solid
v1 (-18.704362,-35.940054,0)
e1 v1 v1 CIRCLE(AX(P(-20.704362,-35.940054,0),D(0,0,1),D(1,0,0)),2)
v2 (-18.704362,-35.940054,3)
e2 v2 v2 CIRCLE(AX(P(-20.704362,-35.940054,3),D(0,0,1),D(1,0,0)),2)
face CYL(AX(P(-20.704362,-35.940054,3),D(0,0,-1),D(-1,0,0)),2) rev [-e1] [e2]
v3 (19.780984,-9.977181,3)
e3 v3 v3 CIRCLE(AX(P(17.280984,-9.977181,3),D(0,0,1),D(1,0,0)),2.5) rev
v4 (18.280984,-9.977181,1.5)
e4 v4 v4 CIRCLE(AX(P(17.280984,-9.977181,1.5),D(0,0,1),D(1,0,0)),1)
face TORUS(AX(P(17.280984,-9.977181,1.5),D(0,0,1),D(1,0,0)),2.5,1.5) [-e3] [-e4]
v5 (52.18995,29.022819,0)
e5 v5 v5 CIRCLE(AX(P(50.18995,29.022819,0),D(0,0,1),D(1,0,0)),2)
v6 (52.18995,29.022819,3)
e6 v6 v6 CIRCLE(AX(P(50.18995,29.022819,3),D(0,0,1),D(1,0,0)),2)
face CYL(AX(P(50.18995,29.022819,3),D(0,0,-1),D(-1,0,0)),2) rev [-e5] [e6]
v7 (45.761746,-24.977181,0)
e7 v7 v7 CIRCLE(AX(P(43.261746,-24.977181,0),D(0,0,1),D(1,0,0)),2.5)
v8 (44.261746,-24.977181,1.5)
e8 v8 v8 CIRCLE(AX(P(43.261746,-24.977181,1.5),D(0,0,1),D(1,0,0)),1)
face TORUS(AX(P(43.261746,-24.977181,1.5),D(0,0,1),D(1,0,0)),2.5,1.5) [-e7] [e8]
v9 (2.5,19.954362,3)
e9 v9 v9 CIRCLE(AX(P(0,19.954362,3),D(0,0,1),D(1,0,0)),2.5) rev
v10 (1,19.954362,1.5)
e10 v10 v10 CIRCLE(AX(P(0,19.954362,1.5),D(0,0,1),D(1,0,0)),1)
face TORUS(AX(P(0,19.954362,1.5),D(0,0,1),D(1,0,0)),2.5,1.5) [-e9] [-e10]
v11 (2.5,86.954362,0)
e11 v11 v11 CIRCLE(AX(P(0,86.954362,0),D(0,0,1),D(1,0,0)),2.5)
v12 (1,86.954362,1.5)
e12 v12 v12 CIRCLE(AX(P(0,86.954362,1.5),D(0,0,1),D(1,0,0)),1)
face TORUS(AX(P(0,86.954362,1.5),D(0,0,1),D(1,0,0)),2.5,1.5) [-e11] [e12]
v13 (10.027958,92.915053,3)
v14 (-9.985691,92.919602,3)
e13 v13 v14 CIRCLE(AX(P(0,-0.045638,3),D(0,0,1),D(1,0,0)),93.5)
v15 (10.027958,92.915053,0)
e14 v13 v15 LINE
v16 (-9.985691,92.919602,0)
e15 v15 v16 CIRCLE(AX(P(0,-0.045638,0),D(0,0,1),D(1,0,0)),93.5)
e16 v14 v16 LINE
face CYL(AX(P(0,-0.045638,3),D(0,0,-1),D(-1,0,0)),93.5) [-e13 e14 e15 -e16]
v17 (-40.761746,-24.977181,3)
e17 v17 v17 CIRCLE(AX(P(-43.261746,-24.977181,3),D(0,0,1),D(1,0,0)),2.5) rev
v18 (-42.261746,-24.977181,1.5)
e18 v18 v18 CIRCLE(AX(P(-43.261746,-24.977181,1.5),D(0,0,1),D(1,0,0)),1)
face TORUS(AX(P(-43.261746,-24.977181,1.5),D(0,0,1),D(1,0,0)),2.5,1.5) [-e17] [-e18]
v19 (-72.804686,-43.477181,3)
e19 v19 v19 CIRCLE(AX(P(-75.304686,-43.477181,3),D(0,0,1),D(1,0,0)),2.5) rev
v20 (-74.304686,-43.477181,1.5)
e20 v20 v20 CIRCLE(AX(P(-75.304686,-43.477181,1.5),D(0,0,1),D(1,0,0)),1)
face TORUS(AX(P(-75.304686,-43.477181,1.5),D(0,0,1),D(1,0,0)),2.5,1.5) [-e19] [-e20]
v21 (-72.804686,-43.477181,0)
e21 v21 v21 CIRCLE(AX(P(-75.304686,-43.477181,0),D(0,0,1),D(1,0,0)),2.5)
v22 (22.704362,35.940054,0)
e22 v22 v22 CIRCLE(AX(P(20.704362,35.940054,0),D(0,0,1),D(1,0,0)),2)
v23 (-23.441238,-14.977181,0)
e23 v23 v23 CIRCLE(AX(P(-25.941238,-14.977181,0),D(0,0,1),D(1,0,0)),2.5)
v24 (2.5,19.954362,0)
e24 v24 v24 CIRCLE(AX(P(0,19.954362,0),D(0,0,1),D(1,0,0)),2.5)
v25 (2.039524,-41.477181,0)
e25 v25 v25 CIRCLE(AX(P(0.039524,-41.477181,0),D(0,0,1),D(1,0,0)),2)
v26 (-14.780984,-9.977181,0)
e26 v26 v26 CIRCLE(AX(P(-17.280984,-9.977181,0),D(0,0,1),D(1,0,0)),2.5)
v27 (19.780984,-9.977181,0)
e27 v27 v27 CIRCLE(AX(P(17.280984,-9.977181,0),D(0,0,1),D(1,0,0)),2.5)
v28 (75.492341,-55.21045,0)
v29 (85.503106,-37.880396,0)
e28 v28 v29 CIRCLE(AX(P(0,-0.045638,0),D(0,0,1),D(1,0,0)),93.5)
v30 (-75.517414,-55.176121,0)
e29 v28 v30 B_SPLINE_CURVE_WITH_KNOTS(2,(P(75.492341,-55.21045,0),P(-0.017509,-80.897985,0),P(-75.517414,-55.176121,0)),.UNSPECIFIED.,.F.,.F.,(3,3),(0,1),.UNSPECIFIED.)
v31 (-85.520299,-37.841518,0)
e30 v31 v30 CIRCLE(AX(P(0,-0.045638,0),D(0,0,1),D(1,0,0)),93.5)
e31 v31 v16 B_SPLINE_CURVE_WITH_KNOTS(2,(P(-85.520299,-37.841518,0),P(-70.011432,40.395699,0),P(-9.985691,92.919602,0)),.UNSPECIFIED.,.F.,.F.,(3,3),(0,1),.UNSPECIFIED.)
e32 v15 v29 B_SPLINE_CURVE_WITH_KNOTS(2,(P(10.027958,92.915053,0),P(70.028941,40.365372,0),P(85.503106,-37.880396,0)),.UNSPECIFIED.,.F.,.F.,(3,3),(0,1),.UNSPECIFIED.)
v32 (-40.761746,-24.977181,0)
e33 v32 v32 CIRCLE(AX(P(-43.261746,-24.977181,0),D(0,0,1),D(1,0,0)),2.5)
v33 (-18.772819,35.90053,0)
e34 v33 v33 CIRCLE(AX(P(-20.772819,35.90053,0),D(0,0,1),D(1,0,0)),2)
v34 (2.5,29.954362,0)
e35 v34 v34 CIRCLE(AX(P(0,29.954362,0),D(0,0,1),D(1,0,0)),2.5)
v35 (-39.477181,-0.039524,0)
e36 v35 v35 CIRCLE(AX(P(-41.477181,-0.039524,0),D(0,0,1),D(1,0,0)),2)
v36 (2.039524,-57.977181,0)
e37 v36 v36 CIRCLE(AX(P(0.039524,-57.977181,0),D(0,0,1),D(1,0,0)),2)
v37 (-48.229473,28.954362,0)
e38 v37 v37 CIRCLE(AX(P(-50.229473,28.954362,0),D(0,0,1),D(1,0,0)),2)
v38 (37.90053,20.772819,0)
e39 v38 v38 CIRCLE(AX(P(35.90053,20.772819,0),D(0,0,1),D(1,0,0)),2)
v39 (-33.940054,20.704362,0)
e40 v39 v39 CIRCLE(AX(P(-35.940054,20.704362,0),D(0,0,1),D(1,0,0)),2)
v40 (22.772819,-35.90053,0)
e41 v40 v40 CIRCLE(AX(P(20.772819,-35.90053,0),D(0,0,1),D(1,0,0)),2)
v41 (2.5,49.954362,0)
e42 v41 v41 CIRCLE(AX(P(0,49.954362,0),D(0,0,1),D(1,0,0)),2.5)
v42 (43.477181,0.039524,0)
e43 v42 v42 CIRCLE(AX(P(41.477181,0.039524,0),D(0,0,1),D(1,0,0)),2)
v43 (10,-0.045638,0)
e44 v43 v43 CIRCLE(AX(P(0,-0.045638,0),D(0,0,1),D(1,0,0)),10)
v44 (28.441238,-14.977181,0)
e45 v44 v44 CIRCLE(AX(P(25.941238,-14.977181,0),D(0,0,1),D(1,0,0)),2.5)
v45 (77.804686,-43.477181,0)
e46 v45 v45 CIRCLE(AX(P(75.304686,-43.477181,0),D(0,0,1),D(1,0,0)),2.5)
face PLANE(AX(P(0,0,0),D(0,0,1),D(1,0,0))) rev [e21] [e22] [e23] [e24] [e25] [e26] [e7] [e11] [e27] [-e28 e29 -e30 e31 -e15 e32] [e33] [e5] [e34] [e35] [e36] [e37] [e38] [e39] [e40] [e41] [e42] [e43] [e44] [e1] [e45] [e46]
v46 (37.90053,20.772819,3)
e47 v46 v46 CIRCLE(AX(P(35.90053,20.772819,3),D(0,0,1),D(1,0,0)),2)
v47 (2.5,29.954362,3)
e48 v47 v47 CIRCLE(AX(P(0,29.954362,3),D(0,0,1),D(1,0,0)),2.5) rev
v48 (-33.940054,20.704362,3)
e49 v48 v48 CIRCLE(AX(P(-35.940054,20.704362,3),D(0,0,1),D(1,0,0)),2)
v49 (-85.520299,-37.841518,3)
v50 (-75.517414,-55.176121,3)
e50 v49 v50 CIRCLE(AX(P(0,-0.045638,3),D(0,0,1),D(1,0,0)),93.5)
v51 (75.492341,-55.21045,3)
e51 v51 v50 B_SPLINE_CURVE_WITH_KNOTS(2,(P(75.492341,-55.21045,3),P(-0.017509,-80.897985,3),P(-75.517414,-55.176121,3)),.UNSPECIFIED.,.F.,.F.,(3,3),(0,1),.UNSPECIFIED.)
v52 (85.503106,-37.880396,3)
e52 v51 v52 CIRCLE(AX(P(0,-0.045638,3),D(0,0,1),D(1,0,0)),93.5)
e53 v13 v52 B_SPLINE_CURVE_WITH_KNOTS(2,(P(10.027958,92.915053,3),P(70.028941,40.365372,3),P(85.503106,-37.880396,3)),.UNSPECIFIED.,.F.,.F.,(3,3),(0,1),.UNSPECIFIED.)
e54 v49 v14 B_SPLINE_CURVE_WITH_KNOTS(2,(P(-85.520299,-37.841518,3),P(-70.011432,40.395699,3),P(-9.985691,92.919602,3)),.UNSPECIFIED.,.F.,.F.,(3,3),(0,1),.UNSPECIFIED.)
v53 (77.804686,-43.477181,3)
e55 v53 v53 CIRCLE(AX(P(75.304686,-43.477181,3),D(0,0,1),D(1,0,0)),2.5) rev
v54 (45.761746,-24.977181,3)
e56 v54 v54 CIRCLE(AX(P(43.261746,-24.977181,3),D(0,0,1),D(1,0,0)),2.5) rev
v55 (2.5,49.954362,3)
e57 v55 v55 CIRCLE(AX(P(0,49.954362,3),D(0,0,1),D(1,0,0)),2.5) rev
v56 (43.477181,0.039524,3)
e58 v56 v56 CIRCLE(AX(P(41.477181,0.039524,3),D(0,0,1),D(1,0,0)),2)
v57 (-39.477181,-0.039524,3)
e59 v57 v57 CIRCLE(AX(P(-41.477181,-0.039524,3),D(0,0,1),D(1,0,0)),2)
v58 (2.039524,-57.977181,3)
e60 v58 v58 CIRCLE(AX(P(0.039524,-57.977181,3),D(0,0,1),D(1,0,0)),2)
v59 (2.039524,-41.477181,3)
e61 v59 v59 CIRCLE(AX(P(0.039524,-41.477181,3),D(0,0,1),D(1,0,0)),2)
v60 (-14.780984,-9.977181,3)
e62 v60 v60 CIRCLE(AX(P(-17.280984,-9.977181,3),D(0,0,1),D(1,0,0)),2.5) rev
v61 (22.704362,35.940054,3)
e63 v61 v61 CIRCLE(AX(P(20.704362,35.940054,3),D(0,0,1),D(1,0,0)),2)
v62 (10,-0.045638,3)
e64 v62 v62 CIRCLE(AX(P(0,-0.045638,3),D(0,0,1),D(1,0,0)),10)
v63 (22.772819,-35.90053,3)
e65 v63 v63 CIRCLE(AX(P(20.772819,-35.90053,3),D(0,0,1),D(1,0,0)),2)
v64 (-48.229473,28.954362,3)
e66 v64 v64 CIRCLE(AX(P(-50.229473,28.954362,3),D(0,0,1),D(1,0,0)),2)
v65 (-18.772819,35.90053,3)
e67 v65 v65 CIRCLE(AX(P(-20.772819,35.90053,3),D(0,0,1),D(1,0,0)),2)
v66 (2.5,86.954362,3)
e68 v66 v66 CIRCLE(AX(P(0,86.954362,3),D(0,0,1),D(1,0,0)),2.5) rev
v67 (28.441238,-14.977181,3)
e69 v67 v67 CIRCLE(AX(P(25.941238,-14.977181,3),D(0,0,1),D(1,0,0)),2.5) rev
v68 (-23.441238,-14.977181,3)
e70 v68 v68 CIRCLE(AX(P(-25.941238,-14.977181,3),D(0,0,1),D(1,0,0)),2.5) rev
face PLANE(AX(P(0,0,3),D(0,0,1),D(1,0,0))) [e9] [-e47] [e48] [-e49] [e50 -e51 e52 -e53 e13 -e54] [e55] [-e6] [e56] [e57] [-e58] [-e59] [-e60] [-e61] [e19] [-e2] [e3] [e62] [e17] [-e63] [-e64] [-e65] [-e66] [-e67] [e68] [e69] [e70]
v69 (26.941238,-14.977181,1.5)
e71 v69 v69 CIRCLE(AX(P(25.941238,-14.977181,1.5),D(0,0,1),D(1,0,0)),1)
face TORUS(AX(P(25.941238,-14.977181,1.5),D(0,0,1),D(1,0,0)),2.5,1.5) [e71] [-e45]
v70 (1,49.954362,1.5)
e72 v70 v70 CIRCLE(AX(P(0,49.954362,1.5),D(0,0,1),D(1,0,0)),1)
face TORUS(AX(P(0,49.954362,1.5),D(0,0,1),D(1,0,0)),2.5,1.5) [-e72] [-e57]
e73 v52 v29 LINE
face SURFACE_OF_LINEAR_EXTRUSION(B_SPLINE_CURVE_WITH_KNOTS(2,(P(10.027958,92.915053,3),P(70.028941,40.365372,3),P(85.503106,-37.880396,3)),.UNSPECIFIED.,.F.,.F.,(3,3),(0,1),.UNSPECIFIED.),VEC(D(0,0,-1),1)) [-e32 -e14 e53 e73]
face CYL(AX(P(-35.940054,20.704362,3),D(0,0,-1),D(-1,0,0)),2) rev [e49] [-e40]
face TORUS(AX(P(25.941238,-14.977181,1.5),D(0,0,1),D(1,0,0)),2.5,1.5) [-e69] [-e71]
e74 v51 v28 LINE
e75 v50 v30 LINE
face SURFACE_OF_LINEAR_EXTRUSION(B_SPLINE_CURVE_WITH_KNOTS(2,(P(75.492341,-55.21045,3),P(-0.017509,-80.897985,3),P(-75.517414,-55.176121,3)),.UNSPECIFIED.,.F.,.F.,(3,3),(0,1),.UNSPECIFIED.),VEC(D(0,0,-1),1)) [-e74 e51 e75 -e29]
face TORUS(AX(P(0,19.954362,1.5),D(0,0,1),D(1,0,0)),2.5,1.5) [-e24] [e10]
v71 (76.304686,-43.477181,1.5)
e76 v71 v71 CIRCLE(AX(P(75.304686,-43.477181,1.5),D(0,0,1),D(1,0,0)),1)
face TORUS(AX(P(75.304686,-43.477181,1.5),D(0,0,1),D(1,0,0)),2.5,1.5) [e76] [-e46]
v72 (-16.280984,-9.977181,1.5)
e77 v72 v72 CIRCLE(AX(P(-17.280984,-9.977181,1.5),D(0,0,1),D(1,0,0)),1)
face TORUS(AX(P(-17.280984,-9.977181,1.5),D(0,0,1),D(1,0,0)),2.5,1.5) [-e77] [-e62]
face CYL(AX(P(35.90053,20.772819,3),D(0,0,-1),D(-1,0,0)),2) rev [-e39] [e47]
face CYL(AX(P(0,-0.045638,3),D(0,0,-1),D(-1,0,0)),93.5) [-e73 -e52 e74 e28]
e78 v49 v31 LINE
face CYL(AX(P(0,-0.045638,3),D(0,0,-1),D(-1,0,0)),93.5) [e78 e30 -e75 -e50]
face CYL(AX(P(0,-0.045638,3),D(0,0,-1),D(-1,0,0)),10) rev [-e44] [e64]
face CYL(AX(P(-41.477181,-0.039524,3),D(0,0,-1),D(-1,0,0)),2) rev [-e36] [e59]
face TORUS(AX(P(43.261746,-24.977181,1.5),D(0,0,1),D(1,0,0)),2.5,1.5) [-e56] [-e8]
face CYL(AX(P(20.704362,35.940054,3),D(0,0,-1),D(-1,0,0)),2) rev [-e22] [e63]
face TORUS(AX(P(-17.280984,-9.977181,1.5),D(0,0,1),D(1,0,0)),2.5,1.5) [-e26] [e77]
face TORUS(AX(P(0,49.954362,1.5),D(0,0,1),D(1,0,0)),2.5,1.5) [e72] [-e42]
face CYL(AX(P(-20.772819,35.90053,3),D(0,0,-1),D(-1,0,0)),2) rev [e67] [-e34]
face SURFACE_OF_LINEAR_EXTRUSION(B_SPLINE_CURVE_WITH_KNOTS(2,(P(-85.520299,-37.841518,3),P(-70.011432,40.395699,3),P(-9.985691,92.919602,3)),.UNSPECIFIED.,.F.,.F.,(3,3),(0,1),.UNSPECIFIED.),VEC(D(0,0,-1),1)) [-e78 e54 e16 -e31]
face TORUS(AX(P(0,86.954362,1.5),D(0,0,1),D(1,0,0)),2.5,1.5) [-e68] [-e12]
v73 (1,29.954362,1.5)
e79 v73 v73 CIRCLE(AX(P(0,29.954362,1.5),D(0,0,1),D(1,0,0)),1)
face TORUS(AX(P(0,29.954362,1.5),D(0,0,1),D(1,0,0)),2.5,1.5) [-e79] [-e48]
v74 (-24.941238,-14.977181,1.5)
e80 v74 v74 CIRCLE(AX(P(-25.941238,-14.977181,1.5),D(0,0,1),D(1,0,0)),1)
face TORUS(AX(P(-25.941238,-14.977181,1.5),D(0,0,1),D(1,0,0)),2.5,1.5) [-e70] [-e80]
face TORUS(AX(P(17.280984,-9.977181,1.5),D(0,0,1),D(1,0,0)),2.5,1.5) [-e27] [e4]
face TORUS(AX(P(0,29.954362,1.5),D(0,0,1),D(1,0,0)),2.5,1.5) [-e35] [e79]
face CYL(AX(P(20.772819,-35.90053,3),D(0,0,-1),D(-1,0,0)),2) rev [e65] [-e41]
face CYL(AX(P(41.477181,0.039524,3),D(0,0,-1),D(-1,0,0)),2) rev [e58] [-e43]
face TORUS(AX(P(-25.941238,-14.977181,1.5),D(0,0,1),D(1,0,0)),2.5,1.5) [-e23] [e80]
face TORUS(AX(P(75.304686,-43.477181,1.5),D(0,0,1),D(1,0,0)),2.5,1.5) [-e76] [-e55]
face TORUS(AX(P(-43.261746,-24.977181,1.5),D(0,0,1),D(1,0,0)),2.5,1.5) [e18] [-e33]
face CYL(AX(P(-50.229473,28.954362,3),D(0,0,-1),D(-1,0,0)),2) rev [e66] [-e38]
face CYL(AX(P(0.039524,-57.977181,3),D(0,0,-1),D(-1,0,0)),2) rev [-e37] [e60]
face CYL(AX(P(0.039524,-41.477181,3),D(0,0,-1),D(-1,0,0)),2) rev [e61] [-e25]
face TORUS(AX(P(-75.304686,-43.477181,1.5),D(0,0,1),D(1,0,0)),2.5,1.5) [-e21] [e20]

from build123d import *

# Parameters (mm, degrees)
SKETCH_1_R      = 1
SKETCH_1_R_2    = 2
EXTRUDE_1_DEPTH = 3
FILLET_1_R      = 1.5


with BuildPart() as part:
    # 草图1 → 凸台-拉伸1 (new body)
    with BuildSketch(Plane.XY):
        with BuildLine():
            add(Edge.make_bspline(
                [(-58.889727457, 33.954361717), (-40.004533189, 66.652425342), (-9.985691385, 92.919602359)],
                knots=[0.499900516, 0.499900516, 0.499900516, 1, 1, 1], degree=2))
            add(Edge.make_bspline(
                [(-85.520298702, -37.841517818), (-77.767408146, 1.269307198), (-58.889727457, 33.954361717)],
                knots=[0, 0, 0, 0.499900516, 0.499900516, 0.499900516], degree=2))
            ThreePointArc((-85.520298702, -37.841517818), (-80.984000735, -46.777229577), (-75.517414372, -55.176121017))
            add(Edge.make_bspline(
                [(75.492341187, -55.21044973), (-0.017509419, -80.897985379), (-75.517414372, -55.176121017)],
                knots=[0, 0, 0, 1, 1, 1], degree=2))
            ThreePointArc((75.492341187, -55.21044973), (80.962745588, -46.814044572), (85.503105757, -37.88039619))
            add(Edge.make_bspline(
                [(10.027957515, 92.915052701), (70.02894125, 40.365371664), (85.503105757, -37.88039619)],
                knots=[0, 0, 0, 1, 1, 1], degree=2))
            ThreePointArc((10.027957515, 92.915052701), (0.021255147, 93.454359301), (-9.985691385, 92.919602359))
        make_face()
        with Locations((-75.304686217, -43.477180859)):
            Circle(SKETCH_1_R, mode=Mode.SUBTRACT)
        with Locations((-43.261746277, -24.977180859)):
            Circle(SKETCH_1_R, mode=Mode.SUBTRACT)
        with Locations((-20.704361717, -35.940054257)):
            Circle(SKETCH_1_R_2, mode=Mode.SUBTRACT)
        with Locations((-41.477180859, -0.039523912)):
            Circle(SKETCH_1_R_2, mode=Mode.SUBTRACT)
        with Locations((-25.941238201, -14.977180859)):
            Circle(SKETCH_1_R, mode=Mode.SUBTRACT)
        with Locations((-17.280984164, -9.977180859)):
            Circle(SKETCH_1_R, mode=Mode.SUBTRACT)
        with BuildLine():
            ThreePointArc((-10, -0.045638283), (-9.659258263, 2.542552168), (-8.660254038, 4.954361717))
            ThreePointArc((-8.660254038, 4.954361717), (9.659258263, -2.633828734), (-10, -0.045638283))
        make_face(mode=Mode.SUBTRACT)
        with Locations((0.039523912, -57.977180859)):
            Circle(SKETCH_1_R_2, mode=Mode.SUBTRACT)
        with Locations((0.039523912, -41.477180859)):
            Circle(SKETCH_1_R_2, mode=Mode.SUBTRACT)
        with Locations((20.772819141, -35.900530345)):
            Circle(SKETCH_1_R_2, mode=Mode.SUBTRACT)
        with Locations((75.304686217, -43.477180859)):
            Circle(SKETCH_1_R, mode=Mode.SUBTRACT)
        with Locations((43.261746277, -24.977180859)):
            Circle(SKETCH_1_R, mode=Mode.SUBTRACT)
        with Locations((17.280984164, -9.977180859)):
            Circle(SKETCH_1_R, mode=Mode.SUBTRACT)
        with Locations((25.941238201, -14.977180859)):
            Circle(SKETCH_1_R, mode=Mode.SUBTRACT)
        with Locations((41.477180859, 0.039523912)):
            Circle(SKETCH_1_R_2, mode=Mode.SUBTRACT)
        with BuildLine():
            ThreePointArc((-48.497422612, 27.954361717), (-51.229473419, 27.22231091), (-51.961524227, 29.954361717))
            ThreePointArc((-51.961524227, 29.954361717), (-49.229473419, 30.686412525), (-48.497422612, 27.954361717))
        make_face(mode=Mode.SUBTRACT)
        with BuildLine():
            ThreePointArc((-34.208003449, 19.704361717), (-36.940054257, 18.97231091), (-37.672105065, 21.704361717))
            ThreePointArc((-37.672105065, 21.704361717), (-34.940054257, 22.436412525), (-34.208003449, 19.704361717))
        make_face(mode=Mode.SUBTRACT)
        with Locations((0, 19.954361717)):
            Circle(SKETCH_1_R, mode=Mode.SUBTRACT)
        with Locations((0, 29.954361717)):
            Circle(SKETCH_1_R, mode=Mode.SUBTRACT)
        with Locations((-20.772819141, 35.900530345)):
            Circle(SKETCH_1_R_2, mode=Mode.SUBTRACT)
        with Locations((0, 49.954361717)):
            Circle(SKETCH_1_R, mode=Mode.SUBTRACT)
        with Locations((0, 86.954361717)):
            Circle(SKETCH_1_R, mode=Mode.SUBTRACT)
        with Locations((35.900530345, 20.772819141)):
            Circle(SKETCH_1_R_2, mode=Mode.SUBTRACT)
        with Locations((20.704361717, 35.940054257)):
            Circle(SKETCH_1_R_2, mode=Mode.SUBTRACT)
        with Locations((50.189949507, 29.022819141)):
            Circle(SKETCH_1_R_2, mode=Mode.SUBTRACT)
    extrude(amount=EXTRUDE_1_DEPTH)

    # 圆角1
    fillet_1_edges = [part.edges().sort_by_distance(p)[0] for p in [
        (-1, 86.954361717, 3),
        (-1, 49.954361717, 3),
        (-1, 29.954361717, 3),
        (-1, 19.954361717, 3),
        (74.304686217, -43.477180859, 3),
        (42.261746277, -24.977180859, 3),
        (24.941238201, -14.977180859, 3),
        (16.280984164, -9.977180859, 3),
        (-76.304686217, -43.477180859, 3),
        (-44.261746277, -24.977180859, 3),
        (-26.941238201, -14.977180859, 3),
        (-18.280984164, -9.977180859, 3),
        (-18.280984164, -9.977180859, 0),
        (-26.941238201, -14.977180859, 0),
        (-44.261746277, -24.977180859, 0),
        (-76.304686217, -43.477180859, 0),
        (16.280984164, -9.977180859, 0),
        (24.941238201, -14.977180859, 0),
        (42.261746277, -24.977180859, 0),
        (74.304686217, -43.477180859, 0),
        (-1, 19.954361717, 0),
        (-1, 29.954361717, 0),
        (-1, 49.954361717, 0),
        (-1, 86.954361717, 0),
    ]]
    fillet(fillet_1_edges, radius=FILLET_1_R - 0.0001)  # a hair under: the kernel refuses the full size


solid = part.part
